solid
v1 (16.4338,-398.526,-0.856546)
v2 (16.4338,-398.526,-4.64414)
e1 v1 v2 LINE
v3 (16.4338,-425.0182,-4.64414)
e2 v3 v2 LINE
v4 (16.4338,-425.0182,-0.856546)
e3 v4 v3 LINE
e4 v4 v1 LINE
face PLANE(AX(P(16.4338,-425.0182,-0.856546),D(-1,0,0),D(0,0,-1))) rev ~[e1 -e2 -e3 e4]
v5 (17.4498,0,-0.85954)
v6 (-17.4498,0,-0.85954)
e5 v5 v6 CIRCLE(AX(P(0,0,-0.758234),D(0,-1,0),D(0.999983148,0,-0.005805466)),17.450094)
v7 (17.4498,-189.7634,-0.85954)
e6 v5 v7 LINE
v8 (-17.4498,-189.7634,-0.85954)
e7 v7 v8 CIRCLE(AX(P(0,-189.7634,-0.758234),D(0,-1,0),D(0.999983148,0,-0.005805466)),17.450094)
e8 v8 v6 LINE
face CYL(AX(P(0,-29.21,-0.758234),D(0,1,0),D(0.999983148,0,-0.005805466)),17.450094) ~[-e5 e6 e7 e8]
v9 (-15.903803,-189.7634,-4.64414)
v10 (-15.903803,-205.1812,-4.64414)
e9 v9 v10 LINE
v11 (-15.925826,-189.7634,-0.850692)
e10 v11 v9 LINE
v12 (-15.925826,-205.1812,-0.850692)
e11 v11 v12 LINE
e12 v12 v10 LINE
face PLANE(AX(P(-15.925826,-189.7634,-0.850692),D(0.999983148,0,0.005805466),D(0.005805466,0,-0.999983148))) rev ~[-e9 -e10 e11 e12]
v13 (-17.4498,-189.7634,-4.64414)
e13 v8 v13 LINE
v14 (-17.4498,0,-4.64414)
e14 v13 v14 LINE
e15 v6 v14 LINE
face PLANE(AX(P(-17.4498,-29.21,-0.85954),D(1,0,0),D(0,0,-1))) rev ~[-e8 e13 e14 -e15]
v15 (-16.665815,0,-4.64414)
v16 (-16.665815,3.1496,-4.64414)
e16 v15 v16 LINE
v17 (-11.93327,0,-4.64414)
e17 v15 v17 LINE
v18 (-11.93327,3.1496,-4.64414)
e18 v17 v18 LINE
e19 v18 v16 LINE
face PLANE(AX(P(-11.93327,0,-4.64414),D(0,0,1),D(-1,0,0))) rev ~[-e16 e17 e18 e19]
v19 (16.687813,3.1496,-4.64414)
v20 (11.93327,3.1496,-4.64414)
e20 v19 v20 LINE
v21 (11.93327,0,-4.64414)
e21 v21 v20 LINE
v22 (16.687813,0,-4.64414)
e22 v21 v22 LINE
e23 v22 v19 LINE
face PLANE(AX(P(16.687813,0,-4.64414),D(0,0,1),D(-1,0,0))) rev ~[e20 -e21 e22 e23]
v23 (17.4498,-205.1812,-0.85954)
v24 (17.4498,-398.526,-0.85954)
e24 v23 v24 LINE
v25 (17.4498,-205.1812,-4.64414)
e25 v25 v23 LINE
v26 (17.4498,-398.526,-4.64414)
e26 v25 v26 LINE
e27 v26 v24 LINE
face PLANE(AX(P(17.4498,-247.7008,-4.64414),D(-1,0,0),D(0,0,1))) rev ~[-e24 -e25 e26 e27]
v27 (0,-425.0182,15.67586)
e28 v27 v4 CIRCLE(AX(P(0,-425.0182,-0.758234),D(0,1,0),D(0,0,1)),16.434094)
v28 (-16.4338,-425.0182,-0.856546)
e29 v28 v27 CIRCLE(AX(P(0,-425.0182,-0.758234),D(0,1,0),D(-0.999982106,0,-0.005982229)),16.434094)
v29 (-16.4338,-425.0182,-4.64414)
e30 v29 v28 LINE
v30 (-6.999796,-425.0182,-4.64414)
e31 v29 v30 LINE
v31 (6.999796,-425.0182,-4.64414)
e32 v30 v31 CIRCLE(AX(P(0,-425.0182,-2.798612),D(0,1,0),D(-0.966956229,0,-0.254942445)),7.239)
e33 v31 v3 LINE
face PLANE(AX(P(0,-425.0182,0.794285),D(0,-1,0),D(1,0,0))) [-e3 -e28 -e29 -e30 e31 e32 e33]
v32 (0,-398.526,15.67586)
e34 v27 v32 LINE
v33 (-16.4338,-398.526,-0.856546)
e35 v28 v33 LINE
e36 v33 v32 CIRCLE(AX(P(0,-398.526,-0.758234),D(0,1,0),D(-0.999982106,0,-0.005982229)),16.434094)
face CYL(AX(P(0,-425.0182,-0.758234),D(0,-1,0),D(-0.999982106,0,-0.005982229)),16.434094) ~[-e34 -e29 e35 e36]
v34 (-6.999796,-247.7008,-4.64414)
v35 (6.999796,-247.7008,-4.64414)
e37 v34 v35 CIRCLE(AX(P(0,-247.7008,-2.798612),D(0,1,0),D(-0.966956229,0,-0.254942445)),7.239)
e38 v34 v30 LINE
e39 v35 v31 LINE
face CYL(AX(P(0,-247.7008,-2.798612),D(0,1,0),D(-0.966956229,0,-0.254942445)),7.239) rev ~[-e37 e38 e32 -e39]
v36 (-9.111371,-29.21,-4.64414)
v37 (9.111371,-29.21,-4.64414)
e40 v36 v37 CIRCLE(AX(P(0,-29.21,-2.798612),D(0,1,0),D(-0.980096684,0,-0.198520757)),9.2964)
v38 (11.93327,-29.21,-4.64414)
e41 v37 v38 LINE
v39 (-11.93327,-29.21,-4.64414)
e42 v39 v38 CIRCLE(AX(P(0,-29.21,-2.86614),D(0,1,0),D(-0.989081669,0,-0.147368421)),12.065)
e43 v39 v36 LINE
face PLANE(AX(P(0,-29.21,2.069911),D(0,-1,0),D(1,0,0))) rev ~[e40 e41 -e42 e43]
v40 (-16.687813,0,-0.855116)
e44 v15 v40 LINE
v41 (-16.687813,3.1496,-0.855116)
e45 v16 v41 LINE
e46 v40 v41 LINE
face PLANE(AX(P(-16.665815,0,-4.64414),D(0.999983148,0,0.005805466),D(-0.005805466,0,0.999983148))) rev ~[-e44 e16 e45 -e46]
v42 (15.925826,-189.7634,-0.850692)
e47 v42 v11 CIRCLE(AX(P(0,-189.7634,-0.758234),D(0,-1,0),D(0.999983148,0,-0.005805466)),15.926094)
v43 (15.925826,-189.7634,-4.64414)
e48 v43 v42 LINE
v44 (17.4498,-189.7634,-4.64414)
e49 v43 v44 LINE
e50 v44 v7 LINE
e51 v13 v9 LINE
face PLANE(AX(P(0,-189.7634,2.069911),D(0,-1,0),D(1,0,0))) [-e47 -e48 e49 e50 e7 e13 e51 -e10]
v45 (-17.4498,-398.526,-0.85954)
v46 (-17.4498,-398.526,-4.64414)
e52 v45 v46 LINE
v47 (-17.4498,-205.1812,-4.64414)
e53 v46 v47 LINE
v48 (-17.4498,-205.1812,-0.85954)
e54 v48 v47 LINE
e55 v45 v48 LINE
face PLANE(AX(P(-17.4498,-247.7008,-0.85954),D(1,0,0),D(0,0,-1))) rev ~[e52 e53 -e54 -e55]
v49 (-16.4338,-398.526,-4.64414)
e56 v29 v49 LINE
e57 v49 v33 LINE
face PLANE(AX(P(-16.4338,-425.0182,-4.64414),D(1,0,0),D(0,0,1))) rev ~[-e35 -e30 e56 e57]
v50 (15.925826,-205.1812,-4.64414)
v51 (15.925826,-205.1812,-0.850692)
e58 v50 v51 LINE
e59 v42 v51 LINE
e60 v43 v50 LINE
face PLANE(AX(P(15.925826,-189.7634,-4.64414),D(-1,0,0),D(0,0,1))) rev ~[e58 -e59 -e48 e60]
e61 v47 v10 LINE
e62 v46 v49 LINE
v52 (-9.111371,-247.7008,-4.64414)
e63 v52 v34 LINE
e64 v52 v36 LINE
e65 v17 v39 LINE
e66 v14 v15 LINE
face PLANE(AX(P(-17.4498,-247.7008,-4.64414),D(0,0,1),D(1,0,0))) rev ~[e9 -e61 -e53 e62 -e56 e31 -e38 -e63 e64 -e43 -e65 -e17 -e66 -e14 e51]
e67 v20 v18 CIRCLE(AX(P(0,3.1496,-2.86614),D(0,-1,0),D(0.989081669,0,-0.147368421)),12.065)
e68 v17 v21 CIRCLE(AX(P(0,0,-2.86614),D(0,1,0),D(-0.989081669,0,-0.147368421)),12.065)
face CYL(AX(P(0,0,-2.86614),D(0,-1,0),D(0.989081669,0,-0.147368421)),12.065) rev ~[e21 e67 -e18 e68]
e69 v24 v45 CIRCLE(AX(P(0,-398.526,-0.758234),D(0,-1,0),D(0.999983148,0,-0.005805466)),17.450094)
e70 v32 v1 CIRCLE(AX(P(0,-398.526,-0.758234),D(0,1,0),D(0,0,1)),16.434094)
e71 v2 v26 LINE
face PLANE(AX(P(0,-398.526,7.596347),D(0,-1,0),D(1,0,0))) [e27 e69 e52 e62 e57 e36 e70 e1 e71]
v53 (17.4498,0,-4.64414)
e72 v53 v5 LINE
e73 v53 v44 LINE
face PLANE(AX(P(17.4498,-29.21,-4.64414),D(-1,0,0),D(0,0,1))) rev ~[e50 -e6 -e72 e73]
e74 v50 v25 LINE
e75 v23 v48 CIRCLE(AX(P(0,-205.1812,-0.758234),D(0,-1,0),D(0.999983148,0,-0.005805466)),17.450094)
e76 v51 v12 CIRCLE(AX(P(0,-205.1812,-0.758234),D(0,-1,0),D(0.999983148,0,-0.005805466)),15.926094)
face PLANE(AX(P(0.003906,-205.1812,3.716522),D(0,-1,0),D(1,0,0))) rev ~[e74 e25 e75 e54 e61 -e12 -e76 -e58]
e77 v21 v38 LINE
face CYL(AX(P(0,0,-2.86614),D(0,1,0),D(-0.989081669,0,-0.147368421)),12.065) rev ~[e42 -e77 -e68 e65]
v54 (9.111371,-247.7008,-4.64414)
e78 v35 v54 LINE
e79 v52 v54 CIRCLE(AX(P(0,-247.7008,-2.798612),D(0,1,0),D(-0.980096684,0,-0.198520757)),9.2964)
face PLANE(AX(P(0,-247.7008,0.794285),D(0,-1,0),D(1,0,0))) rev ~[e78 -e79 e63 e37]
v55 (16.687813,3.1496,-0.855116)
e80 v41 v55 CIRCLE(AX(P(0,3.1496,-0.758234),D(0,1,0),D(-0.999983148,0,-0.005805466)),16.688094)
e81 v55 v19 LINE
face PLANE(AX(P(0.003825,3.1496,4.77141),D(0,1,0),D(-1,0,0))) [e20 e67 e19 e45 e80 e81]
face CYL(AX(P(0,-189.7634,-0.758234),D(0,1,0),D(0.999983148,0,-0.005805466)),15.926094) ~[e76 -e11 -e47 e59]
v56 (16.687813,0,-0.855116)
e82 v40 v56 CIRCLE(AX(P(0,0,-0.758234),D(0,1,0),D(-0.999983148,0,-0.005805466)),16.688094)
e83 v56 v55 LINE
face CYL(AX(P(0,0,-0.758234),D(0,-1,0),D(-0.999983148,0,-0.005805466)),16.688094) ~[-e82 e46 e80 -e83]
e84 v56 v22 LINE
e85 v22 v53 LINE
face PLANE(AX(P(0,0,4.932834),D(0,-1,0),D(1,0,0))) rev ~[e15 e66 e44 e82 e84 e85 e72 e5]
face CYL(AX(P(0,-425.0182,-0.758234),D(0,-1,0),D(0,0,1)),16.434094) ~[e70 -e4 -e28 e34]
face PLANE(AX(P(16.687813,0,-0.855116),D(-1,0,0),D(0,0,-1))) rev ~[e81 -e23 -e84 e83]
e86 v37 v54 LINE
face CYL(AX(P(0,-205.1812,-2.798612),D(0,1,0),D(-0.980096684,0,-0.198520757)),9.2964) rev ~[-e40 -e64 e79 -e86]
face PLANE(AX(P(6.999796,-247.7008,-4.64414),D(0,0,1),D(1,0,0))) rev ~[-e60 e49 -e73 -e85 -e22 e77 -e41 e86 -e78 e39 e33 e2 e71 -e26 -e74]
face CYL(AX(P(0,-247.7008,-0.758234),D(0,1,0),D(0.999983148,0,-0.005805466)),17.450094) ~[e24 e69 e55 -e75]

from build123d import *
from build123d import SkipClean  # not in build123d's __all__

# Parameters (mm, degrees)
F1_DEPTH  = 29.21
F3_DEPTH  = 160.5534
F5_DEPTH  = 15.4178
F7_DEPTH  = 42.5196
F9_DEPTH  = 177.3174
F11_DEPTH = 26.4922
F13_DEPTH = 3.1496


with BuildPart() as f1:
    # F0 (on Front) → F1 (new body)
    with BuildSketch(Plane.XZ):
        with BuildLine():
            Line((11.9332703397, -4.6441399077), (17.4498, -4.6441399077))
            Line((17.4498, -4.6441399077), (17.4498, -0.8595399077))
            ThreePointArc((17.4498, -0.8595399077), (0, 16.6918600923), (-17.4498, -0.8595399077))
            Line((-17.4498, -0.8595399077), (-17.4498, -4.6441399077))
            Line((-17.4498, -4.6441399077), (-11.9332703397, -4.6441399077))
            ThreePointArc((-11.9332703397, -4.6441399077), (0, 9.1988600923), (11.9332703397, -4.6441399077))
        make_face()
    extrude(amount=F1_DEPTH)

    # F2 (on face) → F3 (join)
    with BuildSketch(Plane.XZ.offset(29.21)):
        with BuildLine():
            ThreePointArc((-9.1113708093, -4.6441399077), (0, 6.4977884545), (9.1113708093, -4.6441399077))
            Line((9.1113708093, -4.6441399077), (11.9332703397, -4.6441399077))
            ThreePointArc((11.9332703397, -4.6441399077), (0, 9.1988600923), (-11.9332703397, -4.6441399077))
            Line((-11.9332703397, -4.6441399077), (-9.1113708093, -4.6441399077))
        make_face()
        with BuildLine():
            ThreePointArc((-11.9332703397, -4.6441399077), (0, 9.1988600923), (11.9332703397, -4.6441399077))
            Line((11.9332703397, -4.6441399077), (17.4498, -4.6441399077))
            Line((17.4498, -4.6441399077), (17.4498, -0.8595399077))
            ThreePointArc((17.4498, -0.8595399077), (0, 16.6918600923), (-17.4498, -0.8595399077))
            Line((-17.4498, -0.8595399077), (-17.4498, -4.6441399077))
            Line((-17.4498, -4.6441399077), (-11.9332703397, -4.6441399077))
        make_face()
    extrude(amount=F3_DEPTH)

    # F4 (on face) → F5 (join)
    with BuildSketch(Plane.XZ.offset(189.7634)):
        with BuildLine():
            Line((15.9258256822, -4.6441399077), (15.9258256822, -0.850692377))
            ThreePointArc((15.9258256822, -0.850692377), (0, 15.1678600923), (-15.9258256822, -0.850692377))
            Line((-15.9258256822, -0.850692377), (-15.9038025792, -4.6441399077))
            Line((-15.9038025792, -4.6441399077), (-9.1113708093, -4.6441399077))
            ThreePointArc((-9.1113708093, -4.6441399077), (0, 6.4977884545), (9.1113708093, -4.6441399077))
            Line((9.1113708093, -4.6441399077), (15.9258256822, -4.6441399077))
        make_face()
    extrude(amount=F5_DEPTH)

    # F6 (on face) → F7 (join)
    with BuildSketch(Plane.XZ.offset(205.1812)):
        with BuildLine():
            ThreePointArc((-9.1113708093, -4.6441399077), (0, 6.4977884545), (9.1113708093, -4.6441399077))
            Line((9.1113708093, -4.6441399077), (15.9258256822, -4.6441399077))
            Line((15.9258256822, -4.6441399077), (15.9258256822, -0.850692377))
            ThreePointArc((15.9258256822, -0.850692377), (0, 15.1678600923), (-15.9258256822, -0.850692377))
            Line((-15.9258256822, -0.850692377), (-15.9038025792, -4.6441399077))
            Line((-15.9038025792, -4.6441399077), (-9.1113708093, -4.6441399077))
        make_face()
        with BuildLine():
            Line((15.9258256822, -0.850692377), (15.9258256822, -4.6441399077))
            Line((15.9258256822, -4.6441399077), (17.4498, -4.6441399077))
            Line((17.4498, -4.6441399077), (17.4498, -0.8595399077))
            ThreePointArc((17.4498, -0.8595399077), (0, 16.6918600923), (-17.4498, -0.8595399077))
            Line((-17.4498, -0.8595399077), (-17.4498, -4.6441399077))
            Line((-17.4498, -4.6441399077), (-15.9038025792, -4.6441399077))
            Line((-15.9038025792, -4.6441399077), (-15.9258256822, -0.850692377))
            ThreePointArc((-15.9258256822, -0.850692377), (0, 15.1678600923), (15.9258256822, -0.850692377))
        make_face()
    extrude(amount=F7_DEPTH)

    # F8 (on face) → F9 (join)
    with BuildSketch(Plane.XZ.offset(247.7008)):
        with BuildLine():
            ThreePointArc((9.1113708093, -4.6441399077), (0, 6.4977884545), (-9.1113708093, -4.6441399077))
            Line((-9.1113708093, -4.6441399077), (-6.9997961445, -4.6441399077))
            ThreePointArc((-6.9997961445, -4.6441399077), (0, 4.4403884545), (6.9997961445, -4.6441399077))
            Line((6.9997961445, -4.6441399077), (9.1113708093, -4.6441399077))
        make_face()
        with BuildLine():
            ThreePointArc((17.4498, -0.8595399077), (0, 16.6918600923), (-17.4498, -0.8595399077))
            Line((-17.4498, -0.8595399077), (-17.4498, -4.6441399077))
            Line((-17.4498, -4.6441399077), (-9.1113708093, -4.6441399077))
            ThreePointArc((-9.1113708093, -4.6441399077), (0, 6.4977884545), (9.1113708093, -4.6441399077))
            Line((9.1113708093, -4.6441399077), (17.4498, -4.6441399077))
            Line((17.4498, -4.6441399077), (17.4498, -0.8595399077))
        make_face()
    extrude(amount=F9_DEPTH)

    # F10 (on face) → F11 (cut)
    with BuildSketch(Plane.XZ.offset(425.0182)):
        with BuildLine():
            ThreePointArc((0, 15.6758600923), (11.6553662483, 10.8276145233), (16.4338, -0.8565464805))
            Line((16.4338, -0.8565464805), (16.4338, -4.6441399077))
            Line((16.4338, -4.6441399077), (17.4498, -4.6441399077))
            Line((17.4498, -4.6441399077), (17.4498, -0.8595399077))
            ThreePointArc((17.4498, -0.8595399077), (0, 16.6918600923), (-17.4498, -0.8595399077))
            Line((-17.4498, -0.8595399077), (-17.4498, -4.6441399077))
            Line((-17.4498, -4.6441399077), (-16.4338, -4.6441399077))
            Line((-16.4338, -4.6441399077), (-16.4338, -0.8565464804))
            ThreePointArc((-16.4338, -0.8565464804), (-11.6553662483, 10.8276145233), (0, 15.6758600923))
        make_face()
    extrude(amount=-F11_DEPTH, mode=Mode.SUBTRACT)

    # F12 (on face) → F13 (join)
    with BuildSketch(Plane(origin=(0, 0, 0), x_dir=(-1, 0, 0), z_dir=(0, 1, 0))):
        with BuildLine():
            ThreePointArc((16.6878128411, -0.8551161423), (0, 15.9298600923), (-16.6878128411, -0.8551161423))
            Line((-16.6878128411, -0.8551161423), (-16.6878128411, -4.6441399077))
            Line((-16.6878128411, -4.6441399077), (-11.9332703397, -4.6441399077))
            ThreePointArc((-11.9332703397, -4.6441399077), (0, 9.1988600923), (11.9332703397, -4.6441399077))
            Line((11.9332703397, -4.6441399077), (16.6658154206, -4.6441399077))
            Line((16.6658154206, -4.6441399077), (16.6878128411, -0.8551161423))
        make_face()
    with SkipClean():  # cleaning this boolean's faces spoils the solid; the shape is the same uncleaned
        extrude(amount=F13_DEPTH)


solid = f1.part
